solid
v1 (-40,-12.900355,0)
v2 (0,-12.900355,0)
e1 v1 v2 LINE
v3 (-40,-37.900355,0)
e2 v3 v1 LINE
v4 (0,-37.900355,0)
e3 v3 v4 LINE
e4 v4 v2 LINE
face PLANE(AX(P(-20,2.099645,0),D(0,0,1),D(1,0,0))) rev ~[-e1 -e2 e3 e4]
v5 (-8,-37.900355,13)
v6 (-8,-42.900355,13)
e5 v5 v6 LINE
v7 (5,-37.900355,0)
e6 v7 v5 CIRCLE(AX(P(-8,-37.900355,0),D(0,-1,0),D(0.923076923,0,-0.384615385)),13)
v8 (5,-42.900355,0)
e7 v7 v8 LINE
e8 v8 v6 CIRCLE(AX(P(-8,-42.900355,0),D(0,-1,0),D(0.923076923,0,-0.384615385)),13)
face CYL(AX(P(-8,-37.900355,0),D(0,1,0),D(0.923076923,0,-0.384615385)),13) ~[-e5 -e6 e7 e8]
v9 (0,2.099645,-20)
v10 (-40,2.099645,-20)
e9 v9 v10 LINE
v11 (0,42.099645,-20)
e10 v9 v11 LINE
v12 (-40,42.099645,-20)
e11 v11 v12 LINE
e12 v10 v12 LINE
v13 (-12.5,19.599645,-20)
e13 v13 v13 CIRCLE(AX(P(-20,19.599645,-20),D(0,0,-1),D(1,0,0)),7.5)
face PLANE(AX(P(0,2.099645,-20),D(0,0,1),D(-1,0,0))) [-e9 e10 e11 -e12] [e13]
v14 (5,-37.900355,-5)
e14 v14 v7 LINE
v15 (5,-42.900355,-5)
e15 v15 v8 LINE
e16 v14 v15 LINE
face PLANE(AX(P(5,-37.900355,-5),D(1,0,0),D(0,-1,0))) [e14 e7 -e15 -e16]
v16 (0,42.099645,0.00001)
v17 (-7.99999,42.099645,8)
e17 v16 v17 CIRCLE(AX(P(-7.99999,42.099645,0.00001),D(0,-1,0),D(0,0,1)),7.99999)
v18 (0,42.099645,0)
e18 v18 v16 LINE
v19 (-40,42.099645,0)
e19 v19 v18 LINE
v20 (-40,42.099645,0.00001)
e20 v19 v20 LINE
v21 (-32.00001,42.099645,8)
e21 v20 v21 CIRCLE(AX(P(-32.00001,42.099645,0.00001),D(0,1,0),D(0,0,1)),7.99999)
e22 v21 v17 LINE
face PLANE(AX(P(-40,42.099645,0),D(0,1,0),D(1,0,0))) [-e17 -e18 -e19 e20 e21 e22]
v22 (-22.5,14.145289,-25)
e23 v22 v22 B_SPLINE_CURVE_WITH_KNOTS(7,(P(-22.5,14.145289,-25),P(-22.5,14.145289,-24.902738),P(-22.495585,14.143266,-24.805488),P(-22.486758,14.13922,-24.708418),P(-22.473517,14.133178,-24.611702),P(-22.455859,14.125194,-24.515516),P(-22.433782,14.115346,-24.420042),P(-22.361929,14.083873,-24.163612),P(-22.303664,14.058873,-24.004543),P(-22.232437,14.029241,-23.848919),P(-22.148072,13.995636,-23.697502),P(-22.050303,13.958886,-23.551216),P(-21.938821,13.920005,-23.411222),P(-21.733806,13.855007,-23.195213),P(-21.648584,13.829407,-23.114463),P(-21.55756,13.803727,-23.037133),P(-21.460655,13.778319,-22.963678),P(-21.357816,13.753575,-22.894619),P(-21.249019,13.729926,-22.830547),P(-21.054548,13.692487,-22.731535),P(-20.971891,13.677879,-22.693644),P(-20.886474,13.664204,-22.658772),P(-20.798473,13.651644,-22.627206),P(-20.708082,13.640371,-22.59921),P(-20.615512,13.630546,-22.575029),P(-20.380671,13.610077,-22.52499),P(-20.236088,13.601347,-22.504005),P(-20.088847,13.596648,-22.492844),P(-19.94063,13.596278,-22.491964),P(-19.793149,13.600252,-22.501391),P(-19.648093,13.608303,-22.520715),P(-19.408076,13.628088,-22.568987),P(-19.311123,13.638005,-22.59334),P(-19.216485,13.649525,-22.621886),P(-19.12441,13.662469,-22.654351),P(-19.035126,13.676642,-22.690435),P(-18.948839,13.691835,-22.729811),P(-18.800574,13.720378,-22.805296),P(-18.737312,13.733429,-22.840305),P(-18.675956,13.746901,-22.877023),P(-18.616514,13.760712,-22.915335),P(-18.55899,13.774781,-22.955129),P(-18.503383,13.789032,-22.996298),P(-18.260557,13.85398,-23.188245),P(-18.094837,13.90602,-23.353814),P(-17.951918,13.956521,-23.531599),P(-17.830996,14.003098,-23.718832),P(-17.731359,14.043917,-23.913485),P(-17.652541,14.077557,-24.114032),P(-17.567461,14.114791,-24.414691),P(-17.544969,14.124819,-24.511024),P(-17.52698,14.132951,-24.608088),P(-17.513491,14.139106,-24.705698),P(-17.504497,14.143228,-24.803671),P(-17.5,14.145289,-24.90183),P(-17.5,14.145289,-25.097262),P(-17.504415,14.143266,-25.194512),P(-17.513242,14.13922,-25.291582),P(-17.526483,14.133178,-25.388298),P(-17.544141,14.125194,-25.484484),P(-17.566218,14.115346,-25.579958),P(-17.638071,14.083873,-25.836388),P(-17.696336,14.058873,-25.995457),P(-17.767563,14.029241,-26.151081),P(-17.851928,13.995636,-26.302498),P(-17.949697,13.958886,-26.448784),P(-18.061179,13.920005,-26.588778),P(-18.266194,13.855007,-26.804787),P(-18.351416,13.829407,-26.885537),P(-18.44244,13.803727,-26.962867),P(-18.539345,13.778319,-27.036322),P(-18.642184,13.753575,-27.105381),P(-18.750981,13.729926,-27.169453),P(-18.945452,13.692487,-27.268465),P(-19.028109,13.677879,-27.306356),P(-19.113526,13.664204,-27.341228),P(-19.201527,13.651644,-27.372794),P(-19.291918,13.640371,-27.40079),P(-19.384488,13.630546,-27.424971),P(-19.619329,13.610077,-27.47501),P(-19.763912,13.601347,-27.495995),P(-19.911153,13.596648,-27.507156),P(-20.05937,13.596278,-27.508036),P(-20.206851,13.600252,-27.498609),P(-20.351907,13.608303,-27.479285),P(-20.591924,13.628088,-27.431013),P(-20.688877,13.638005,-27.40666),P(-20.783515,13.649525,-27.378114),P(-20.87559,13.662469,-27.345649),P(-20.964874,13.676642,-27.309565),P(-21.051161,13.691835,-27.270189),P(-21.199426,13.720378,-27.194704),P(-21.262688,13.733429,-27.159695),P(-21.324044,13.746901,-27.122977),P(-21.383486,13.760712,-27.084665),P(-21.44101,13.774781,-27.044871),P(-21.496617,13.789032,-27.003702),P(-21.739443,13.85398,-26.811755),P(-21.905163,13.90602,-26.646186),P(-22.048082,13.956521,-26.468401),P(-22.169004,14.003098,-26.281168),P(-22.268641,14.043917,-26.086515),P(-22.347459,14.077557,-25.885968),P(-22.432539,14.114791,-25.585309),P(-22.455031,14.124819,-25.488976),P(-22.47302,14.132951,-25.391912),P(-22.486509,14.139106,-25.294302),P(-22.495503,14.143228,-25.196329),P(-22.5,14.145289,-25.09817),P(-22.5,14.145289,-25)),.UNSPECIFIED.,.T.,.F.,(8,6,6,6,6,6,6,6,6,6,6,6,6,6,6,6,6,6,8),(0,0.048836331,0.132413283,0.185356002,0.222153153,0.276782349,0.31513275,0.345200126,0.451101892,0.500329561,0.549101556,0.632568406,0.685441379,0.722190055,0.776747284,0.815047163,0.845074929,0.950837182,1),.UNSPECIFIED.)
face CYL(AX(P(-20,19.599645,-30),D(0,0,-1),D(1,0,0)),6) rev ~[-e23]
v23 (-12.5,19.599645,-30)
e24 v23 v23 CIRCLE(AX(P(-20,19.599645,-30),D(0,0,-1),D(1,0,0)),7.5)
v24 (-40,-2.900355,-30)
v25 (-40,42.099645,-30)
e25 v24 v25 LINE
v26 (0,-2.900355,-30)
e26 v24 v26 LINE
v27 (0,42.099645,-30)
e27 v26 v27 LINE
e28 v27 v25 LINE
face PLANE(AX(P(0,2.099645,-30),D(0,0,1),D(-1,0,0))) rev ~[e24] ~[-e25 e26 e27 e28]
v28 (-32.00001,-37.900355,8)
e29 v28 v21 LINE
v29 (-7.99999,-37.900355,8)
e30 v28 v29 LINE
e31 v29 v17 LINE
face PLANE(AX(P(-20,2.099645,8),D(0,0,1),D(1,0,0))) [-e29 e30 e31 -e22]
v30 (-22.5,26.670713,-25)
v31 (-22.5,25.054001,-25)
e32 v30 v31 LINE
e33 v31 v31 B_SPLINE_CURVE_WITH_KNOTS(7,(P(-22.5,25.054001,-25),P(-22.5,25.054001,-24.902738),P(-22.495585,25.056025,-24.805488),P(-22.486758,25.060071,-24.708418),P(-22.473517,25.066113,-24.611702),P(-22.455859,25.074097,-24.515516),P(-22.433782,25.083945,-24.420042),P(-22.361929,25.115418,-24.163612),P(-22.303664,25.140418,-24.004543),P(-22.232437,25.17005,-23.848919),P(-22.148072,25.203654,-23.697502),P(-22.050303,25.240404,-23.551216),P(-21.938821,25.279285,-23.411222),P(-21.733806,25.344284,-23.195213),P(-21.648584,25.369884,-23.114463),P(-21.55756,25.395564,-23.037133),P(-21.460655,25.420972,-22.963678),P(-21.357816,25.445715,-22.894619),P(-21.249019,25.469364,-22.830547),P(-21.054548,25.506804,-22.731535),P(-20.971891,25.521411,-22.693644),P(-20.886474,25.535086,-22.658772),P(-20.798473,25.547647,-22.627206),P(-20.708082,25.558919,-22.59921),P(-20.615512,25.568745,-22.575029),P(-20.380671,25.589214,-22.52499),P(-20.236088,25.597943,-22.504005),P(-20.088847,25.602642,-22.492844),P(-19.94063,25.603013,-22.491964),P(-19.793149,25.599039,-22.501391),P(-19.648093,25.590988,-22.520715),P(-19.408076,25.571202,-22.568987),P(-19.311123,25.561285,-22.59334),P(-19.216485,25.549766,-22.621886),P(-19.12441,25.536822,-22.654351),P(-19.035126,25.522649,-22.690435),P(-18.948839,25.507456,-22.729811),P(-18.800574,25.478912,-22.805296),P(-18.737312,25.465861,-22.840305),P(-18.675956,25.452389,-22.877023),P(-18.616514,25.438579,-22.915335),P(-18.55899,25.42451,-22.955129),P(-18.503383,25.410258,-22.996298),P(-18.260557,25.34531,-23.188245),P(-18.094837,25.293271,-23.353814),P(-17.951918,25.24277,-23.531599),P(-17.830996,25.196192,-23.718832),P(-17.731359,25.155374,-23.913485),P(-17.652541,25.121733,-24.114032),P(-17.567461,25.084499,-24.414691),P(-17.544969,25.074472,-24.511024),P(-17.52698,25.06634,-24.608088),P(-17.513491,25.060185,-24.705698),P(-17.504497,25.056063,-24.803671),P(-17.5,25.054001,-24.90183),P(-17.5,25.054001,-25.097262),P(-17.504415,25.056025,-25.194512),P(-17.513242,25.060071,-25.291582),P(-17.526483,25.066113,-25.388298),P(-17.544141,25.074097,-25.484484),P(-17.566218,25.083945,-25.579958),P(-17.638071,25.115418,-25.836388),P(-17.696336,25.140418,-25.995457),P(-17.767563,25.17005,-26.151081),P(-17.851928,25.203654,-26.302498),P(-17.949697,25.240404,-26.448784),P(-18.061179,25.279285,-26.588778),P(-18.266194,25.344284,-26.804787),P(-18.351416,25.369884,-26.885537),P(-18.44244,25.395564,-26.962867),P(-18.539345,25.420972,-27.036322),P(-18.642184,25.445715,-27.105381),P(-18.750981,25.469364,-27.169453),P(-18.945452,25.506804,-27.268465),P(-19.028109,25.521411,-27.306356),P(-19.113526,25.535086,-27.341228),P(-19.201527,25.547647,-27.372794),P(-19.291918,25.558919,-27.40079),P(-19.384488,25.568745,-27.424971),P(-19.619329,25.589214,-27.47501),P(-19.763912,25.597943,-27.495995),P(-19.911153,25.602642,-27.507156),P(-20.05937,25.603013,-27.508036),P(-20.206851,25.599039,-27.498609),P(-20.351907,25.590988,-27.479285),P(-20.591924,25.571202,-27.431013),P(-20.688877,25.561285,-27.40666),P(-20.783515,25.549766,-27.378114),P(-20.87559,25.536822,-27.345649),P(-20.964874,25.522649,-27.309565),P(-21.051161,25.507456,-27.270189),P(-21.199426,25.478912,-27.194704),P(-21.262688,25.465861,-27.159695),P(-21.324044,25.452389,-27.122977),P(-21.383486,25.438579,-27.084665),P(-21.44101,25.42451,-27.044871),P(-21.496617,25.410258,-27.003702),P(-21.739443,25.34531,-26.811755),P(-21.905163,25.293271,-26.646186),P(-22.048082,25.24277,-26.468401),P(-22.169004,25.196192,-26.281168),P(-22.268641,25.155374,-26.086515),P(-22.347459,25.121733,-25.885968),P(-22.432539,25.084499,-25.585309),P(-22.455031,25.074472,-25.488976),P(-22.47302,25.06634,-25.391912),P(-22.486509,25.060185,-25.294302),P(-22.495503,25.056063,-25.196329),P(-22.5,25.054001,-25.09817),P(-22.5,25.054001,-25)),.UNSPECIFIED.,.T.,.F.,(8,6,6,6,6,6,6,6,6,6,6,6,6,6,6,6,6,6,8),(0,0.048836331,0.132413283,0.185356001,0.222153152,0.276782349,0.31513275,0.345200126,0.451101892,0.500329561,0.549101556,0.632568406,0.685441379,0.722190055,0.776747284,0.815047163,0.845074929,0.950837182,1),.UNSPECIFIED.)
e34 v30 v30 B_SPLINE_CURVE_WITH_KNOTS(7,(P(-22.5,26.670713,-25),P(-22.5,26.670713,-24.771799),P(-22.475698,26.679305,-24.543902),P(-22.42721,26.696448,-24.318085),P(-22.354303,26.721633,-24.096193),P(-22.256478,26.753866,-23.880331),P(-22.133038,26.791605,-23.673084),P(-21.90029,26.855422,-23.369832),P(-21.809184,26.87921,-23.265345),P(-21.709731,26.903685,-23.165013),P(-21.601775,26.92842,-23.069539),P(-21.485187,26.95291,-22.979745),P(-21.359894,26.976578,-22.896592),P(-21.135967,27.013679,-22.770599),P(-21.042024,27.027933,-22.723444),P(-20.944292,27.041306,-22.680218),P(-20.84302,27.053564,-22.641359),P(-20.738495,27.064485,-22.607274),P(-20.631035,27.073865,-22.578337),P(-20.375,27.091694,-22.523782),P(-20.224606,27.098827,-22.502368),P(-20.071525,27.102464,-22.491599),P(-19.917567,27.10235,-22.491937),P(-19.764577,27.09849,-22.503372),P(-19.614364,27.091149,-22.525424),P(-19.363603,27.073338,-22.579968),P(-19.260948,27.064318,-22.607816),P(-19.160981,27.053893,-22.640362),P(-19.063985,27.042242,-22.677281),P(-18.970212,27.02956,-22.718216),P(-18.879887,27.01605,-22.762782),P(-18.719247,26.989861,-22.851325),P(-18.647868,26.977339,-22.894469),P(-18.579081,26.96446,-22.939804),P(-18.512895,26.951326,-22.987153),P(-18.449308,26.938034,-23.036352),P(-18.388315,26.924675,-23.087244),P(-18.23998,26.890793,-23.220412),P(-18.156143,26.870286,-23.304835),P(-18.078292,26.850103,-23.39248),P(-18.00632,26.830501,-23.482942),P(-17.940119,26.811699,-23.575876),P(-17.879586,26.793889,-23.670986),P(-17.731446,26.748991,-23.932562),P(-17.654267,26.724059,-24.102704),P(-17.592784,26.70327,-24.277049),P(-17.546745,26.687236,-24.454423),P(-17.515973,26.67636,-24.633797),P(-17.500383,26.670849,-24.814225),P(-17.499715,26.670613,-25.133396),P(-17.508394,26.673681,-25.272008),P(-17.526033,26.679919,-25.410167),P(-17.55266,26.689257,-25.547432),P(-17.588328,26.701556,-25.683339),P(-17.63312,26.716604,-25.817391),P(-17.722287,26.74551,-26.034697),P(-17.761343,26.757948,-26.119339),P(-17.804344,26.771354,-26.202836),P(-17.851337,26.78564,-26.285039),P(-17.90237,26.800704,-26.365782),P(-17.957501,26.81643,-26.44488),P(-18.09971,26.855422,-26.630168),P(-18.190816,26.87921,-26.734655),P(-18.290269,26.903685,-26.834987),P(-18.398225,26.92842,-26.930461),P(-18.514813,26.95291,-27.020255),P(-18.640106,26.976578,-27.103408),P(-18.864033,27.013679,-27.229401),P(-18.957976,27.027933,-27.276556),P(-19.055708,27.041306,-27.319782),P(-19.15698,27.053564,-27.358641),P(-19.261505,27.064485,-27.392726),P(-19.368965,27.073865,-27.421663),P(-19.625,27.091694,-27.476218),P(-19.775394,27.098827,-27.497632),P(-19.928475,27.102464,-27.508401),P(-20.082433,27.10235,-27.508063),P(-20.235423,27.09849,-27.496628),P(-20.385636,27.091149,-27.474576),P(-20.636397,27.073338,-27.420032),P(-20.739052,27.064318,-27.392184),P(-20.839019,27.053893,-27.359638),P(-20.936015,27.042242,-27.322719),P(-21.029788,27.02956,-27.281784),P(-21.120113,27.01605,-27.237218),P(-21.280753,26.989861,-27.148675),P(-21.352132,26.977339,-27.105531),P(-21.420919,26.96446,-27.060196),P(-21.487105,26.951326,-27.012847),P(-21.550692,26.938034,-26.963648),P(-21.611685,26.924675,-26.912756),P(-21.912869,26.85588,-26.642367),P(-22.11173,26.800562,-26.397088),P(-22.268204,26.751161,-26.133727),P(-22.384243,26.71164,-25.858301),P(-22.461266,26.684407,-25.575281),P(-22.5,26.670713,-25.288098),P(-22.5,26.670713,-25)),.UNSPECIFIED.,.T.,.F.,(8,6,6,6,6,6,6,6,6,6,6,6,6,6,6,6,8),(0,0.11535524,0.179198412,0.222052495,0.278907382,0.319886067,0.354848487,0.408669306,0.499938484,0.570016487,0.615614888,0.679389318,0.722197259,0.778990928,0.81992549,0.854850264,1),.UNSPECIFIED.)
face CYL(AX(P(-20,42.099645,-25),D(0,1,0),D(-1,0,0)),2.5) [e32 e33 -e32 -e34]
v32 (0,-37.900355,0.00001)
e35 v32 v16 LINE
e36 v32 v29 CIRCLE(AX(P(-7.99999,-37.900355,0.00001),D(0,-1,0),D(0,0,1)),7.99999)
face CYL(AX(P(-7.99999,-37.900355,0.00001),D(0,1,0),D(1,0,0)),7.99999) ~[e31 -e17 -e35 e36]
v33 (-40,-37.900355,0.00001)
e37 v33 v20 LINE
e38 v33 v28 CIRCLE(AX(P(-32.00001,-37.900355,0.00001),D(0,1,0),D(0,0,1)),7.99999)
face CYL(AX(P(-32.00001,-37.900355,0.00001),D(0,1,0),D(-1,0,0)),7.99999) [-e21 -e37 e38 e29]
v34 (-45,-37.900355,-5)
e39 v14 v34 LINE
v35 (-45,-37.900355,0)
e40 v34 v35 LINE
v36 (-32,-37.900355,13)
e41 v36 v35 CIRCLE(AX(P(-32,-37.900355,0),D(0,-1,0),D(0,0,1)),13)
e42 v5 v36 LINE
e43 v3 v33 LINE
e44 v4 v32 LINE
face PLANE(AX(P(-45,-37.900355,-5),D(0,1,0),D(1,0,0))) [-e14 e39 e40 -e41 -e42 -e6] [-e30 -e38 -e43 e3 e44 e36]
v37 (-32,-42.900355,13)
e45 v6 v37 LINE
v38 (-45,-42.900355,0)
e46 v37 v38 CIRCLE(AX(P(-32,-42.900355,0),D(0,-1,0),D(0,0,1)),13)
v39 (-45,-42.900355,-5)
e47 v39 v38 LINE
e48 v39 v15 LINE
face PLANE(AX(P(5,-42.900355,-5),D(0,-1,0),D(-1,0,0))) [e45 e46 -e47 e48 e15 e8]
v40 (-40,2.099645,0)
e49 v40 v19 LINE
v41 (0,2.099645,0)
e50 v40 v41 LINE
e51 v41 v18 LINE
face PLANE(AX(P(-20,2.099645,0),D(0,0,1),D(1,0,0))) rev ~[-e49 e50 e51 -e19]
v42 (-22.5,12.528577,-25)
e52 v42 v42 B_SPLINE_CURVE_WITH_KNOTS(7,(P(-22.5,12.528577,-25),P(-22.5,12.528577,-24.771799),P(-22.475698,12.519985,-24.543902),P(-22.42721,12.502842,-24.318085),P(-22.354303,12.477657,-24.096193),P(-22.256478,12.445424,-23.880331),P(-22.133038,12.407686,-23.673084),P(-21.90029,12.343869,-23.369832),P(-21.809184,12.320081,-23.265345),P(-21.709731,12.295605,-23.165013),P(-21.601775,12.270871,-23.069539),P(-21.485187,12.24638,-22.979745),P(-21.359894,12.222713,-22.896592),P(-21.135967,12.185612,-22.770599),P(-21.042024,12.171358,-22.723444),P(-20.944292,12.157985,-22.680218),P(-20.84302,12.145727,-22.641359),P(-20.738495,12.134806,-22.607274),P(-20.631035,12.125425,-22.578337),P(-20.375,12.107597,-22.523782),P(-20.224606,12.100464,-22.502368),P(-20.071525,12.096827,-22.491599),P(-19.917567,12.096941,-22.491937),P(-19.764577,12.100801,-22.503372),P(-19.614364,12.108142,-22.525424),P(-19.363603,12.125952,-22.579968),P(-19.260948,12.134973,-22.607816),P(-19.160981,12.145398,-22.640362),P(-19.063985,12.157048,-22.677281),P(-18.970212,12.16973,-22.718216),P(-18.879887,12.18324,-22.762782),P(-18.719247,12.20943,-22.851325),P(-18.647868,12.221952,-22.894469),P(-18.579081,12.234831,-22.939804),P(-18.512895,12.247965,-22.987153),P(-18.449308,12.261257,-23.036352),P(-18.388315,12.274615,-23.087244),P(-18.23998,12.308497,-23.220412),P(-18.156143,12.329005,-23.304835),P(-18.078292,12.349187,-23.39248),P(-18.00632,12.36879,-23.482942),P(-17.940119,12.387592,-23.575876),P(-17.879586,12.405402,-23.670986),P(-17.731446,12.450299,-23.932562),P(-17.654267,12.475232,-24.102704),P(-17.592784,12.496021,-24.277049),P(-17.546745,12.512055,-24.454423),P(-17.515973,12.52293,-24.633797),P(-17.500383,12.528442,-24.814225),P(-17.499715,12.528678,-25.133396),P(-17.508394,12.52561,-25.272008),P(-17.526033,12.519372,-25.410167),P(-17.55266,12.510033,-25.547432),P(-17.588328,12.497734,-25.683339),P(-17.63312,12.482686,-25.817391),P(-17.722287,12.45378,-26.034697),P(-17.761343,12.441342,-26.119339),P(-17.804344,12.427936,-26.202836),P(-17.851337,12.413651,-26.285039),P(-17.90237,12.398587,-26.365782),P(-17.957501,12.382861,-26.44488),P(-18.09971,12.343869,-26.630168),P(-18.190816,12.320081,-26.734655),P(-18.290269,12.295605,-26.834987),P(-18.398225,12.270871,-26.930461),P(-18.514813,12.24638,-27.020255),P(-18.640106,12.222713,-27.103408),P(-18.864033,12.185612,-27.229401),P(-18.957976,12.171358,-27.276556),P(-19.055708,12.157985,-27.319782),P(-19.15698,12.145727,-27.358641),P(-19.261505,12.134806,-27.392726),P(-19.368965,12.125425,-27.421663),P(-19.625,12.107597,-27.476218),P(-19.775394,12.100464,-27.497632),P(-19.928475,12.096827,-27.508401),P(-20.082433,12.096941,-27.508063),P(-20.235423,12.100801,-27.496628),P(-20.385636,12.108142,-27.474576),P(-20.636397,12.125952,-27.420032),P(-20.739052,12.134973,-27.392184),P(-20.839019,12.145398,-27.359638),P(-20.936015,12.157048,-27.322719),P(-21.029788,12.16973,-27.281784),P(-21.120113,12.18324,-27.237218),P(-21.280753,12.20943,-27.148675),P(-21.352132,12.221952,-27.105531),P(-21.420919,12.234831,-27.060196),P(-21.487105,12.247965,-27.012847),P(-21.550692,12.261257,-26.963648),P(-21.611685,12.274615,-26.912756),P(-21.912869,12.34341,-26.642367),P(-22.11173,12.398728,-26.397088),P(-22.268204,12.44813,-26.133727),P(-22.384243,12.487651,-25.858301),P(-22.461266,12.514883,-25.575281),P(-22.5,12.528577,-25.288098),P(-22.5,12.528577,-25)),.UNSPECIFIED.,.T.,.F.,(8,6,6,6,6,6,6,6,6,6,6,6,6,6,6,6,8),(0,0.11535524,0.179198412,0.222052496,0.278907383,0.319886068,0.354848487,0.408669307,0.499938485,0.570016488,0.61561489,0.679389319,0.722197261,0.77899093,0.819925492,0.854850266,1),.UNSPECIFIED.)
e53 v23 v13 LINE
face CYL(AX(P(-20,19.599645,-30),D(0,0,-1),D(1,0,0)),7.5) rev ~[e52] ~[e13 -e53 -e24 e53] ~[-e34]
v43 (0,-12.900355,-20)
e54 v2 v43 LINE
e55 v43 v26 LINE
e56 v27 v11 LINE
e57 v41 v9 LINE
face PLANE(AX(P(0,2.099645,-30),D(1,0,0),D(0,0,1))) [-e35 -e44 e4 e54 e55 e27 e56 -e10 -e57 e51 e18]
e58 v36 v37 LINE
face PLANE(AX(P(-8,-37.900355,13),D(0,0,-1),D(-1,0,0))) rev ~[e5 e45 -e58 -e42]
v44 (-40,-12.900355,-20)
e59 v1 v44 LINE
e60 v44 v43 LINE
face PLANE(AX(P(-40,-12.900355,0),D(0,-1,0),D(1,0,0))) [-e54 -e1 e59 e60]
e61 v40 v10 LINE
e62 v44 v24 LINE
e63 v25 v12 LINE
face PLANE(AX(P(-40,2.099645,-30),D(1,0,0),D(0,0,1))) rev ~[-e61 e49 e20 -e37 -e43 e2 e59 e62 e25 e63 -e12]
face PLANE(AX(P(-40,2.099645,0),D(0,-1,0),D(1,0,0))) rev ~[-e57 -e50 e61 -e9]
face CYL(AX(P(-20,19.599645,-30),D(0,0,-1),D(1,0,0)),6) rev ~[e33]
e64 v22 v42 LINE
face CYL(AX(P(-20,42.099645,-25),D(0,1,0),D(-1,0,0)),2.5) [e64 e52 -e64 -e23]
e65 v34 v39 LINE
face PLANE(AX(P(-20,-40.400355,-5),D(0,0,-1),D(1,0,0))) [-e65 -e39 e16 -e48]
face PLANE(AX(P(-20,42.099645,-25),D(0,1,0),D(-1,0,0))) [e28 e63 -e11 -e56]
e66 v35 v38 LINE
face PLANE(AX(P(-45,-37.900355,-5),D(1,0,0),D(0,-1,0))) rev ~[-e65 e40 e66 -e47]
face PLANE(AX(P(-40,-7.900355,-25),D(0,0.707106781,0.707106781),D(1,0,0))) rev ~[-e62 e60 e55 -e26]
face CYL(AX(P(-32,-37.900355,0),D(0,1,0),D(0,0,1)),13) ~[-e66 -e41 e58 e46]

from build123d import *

# Parameters (mm, degrees)
F0_W      = 40
F0_H      = 80
F1_DEPTH  = 8
F2_W      = 40
F2_H      = 15
F3_DEPTH  = 30
F4_W      = 40
F4_H      = 10
F5_DEPTH  = 40
F6_R      = 7.99999
F7_SIZE2  = 10
F7_SIZE   = 10
F9_DEPTH  = 5
F10_W     = 48
F10_H     = 5
F10_W_2   = 1
F11_DEPTH = 5
F12_R     = 7.5
F12_R_2   = 6
F13_DEPTH = 11
F14_R     = 2.5
F15_DEPTH = 32
F16_DEPTH = 25


# Not quite as in the source:
# - a fillet or chamfer is up to 0.001 mm smaller than in the source, because OpenCascade refuses the exact size


with BuildPart() as f1:
    # F0 (on Top) → F1 (new body)
    with BuildSketch(Plane.XY):
        with Locations((-20, 2.0996452868)):
            Rectangle(F0_W, F0_H)
    extrude(amount=F1_DEPTH)

    # F2 (on face) → F3 (join)
    with BuildSketch(Plane(origin=(0, 0, 0), x_dir=(1, 0, 0), z_dir=(0, 0, -1))):
        with Locations((-20, 5.4003547132)):
            Rectangle(F2_W, F2_H)
    extrude(amount=F3_DEPTH)

    # F4 (on face) → F5 (join)
    with BuildSketch(Plane(origin=(0, 2.0996452868, 0), x_dir=(-1, 0, 0), z_dir=(0, 1, 0))):
        with Locations((20, -25)):
            Rectangle(F4_W, F4_H)
    extrude(amount=F5_DEPTH)

    # F6 (radius 8 in the source; OpenCascade refuses exactly that, so slightly less here)
    f6_edges = [f1.edges().sort_by_distance(p)[0] for p in [
        (0, 2.099645, 8),
        (-40, 2.099645, 8),
    ]]
    fillet(f6_edges, radius=F6_R)

    # F7
    f7_edges = [f1.edges().sort_by_distance(p)[0] for p in [
        (-20, -12.900355, -30),
    ]]
    chamfer(f7_edges, length=F7_SIZE, length2=F7_SIZE2)

    # F8 (on face) → F9 (join)
    with BuildSketch(Plane.XZ.offset(37.9003547132)):
        with BuildLine():
            Line((-44, -5), (4, -5))
            ThreePointArc((4, -5), (2.8166538264, 7.2111025509), (-8, 13))
            Line((-8, 13), (-32, 13))
            ThreePointArc((-32, 13), (-42.8166538264, 7.2111025509), (-44, -5))
        make_face()
    extrude(amount=F9_DEPTH)

    # F10 (on face) → F11 (join)
    with BuildSketch(Plane(origin=(0, 0, -5), x_dir=(1, 0, 0), z_dir=(0, 0, -1))):
        with Locations((-20, 40.4003547132)):
            Rectangle(F10_W, F10_H)
        with Locations((-44.5, 40.4003547132)):
            Rectangle(F10_W_2, F10_H)
        with Locations((4.5, 40.4003547132)):
            Rectangle(F10_W_2, F10_H)
    extrude(amount=-F11_DEPTH)

    # F12 (on face) → F13 (cut)
    with BuildSketch(Plane(origin=(0, 0, -30), x_dir=(1, 0, 0), z_dir=(0, 0, -1))):
        with Locations((-20, -19.5996452868)):
            Circle(F12_R)
        with Locations((-20, -19.5996452868)):
            Circle(F12_R_2, mode=Mode.SUBTRACT)
        with Locations((-20, -19.5996452868)):
            Circle(F12_R_2)
    extrude(amount=-F13_DEPTH, mode=Mode.SUBTRACT)

    # F14 (on face) → F15 (join)
    with BuildSketch(Plane(origin=(0, 42.0996452868, 0), x_dir=(-1, 0, 0), z_dir=(0, 1, 0))):
        with Locations((20, -25)):
            Circle(F14_R)
    extrude(amount=-F15_DEPTH)

    # F12 (on face) → F16 (cut)
    with BuildSketch(Plane(origin=(0, 0, -30), x_dir=(1, 0, 0), z_dir=(0, 0, -1))):
        with Locations((-20, -19.5996452868)):
            Circle(F12_R_2)
    extrude(amount=-F16_DEPTH, mode=Mode.SUBTRACT)


solid = f1.part
